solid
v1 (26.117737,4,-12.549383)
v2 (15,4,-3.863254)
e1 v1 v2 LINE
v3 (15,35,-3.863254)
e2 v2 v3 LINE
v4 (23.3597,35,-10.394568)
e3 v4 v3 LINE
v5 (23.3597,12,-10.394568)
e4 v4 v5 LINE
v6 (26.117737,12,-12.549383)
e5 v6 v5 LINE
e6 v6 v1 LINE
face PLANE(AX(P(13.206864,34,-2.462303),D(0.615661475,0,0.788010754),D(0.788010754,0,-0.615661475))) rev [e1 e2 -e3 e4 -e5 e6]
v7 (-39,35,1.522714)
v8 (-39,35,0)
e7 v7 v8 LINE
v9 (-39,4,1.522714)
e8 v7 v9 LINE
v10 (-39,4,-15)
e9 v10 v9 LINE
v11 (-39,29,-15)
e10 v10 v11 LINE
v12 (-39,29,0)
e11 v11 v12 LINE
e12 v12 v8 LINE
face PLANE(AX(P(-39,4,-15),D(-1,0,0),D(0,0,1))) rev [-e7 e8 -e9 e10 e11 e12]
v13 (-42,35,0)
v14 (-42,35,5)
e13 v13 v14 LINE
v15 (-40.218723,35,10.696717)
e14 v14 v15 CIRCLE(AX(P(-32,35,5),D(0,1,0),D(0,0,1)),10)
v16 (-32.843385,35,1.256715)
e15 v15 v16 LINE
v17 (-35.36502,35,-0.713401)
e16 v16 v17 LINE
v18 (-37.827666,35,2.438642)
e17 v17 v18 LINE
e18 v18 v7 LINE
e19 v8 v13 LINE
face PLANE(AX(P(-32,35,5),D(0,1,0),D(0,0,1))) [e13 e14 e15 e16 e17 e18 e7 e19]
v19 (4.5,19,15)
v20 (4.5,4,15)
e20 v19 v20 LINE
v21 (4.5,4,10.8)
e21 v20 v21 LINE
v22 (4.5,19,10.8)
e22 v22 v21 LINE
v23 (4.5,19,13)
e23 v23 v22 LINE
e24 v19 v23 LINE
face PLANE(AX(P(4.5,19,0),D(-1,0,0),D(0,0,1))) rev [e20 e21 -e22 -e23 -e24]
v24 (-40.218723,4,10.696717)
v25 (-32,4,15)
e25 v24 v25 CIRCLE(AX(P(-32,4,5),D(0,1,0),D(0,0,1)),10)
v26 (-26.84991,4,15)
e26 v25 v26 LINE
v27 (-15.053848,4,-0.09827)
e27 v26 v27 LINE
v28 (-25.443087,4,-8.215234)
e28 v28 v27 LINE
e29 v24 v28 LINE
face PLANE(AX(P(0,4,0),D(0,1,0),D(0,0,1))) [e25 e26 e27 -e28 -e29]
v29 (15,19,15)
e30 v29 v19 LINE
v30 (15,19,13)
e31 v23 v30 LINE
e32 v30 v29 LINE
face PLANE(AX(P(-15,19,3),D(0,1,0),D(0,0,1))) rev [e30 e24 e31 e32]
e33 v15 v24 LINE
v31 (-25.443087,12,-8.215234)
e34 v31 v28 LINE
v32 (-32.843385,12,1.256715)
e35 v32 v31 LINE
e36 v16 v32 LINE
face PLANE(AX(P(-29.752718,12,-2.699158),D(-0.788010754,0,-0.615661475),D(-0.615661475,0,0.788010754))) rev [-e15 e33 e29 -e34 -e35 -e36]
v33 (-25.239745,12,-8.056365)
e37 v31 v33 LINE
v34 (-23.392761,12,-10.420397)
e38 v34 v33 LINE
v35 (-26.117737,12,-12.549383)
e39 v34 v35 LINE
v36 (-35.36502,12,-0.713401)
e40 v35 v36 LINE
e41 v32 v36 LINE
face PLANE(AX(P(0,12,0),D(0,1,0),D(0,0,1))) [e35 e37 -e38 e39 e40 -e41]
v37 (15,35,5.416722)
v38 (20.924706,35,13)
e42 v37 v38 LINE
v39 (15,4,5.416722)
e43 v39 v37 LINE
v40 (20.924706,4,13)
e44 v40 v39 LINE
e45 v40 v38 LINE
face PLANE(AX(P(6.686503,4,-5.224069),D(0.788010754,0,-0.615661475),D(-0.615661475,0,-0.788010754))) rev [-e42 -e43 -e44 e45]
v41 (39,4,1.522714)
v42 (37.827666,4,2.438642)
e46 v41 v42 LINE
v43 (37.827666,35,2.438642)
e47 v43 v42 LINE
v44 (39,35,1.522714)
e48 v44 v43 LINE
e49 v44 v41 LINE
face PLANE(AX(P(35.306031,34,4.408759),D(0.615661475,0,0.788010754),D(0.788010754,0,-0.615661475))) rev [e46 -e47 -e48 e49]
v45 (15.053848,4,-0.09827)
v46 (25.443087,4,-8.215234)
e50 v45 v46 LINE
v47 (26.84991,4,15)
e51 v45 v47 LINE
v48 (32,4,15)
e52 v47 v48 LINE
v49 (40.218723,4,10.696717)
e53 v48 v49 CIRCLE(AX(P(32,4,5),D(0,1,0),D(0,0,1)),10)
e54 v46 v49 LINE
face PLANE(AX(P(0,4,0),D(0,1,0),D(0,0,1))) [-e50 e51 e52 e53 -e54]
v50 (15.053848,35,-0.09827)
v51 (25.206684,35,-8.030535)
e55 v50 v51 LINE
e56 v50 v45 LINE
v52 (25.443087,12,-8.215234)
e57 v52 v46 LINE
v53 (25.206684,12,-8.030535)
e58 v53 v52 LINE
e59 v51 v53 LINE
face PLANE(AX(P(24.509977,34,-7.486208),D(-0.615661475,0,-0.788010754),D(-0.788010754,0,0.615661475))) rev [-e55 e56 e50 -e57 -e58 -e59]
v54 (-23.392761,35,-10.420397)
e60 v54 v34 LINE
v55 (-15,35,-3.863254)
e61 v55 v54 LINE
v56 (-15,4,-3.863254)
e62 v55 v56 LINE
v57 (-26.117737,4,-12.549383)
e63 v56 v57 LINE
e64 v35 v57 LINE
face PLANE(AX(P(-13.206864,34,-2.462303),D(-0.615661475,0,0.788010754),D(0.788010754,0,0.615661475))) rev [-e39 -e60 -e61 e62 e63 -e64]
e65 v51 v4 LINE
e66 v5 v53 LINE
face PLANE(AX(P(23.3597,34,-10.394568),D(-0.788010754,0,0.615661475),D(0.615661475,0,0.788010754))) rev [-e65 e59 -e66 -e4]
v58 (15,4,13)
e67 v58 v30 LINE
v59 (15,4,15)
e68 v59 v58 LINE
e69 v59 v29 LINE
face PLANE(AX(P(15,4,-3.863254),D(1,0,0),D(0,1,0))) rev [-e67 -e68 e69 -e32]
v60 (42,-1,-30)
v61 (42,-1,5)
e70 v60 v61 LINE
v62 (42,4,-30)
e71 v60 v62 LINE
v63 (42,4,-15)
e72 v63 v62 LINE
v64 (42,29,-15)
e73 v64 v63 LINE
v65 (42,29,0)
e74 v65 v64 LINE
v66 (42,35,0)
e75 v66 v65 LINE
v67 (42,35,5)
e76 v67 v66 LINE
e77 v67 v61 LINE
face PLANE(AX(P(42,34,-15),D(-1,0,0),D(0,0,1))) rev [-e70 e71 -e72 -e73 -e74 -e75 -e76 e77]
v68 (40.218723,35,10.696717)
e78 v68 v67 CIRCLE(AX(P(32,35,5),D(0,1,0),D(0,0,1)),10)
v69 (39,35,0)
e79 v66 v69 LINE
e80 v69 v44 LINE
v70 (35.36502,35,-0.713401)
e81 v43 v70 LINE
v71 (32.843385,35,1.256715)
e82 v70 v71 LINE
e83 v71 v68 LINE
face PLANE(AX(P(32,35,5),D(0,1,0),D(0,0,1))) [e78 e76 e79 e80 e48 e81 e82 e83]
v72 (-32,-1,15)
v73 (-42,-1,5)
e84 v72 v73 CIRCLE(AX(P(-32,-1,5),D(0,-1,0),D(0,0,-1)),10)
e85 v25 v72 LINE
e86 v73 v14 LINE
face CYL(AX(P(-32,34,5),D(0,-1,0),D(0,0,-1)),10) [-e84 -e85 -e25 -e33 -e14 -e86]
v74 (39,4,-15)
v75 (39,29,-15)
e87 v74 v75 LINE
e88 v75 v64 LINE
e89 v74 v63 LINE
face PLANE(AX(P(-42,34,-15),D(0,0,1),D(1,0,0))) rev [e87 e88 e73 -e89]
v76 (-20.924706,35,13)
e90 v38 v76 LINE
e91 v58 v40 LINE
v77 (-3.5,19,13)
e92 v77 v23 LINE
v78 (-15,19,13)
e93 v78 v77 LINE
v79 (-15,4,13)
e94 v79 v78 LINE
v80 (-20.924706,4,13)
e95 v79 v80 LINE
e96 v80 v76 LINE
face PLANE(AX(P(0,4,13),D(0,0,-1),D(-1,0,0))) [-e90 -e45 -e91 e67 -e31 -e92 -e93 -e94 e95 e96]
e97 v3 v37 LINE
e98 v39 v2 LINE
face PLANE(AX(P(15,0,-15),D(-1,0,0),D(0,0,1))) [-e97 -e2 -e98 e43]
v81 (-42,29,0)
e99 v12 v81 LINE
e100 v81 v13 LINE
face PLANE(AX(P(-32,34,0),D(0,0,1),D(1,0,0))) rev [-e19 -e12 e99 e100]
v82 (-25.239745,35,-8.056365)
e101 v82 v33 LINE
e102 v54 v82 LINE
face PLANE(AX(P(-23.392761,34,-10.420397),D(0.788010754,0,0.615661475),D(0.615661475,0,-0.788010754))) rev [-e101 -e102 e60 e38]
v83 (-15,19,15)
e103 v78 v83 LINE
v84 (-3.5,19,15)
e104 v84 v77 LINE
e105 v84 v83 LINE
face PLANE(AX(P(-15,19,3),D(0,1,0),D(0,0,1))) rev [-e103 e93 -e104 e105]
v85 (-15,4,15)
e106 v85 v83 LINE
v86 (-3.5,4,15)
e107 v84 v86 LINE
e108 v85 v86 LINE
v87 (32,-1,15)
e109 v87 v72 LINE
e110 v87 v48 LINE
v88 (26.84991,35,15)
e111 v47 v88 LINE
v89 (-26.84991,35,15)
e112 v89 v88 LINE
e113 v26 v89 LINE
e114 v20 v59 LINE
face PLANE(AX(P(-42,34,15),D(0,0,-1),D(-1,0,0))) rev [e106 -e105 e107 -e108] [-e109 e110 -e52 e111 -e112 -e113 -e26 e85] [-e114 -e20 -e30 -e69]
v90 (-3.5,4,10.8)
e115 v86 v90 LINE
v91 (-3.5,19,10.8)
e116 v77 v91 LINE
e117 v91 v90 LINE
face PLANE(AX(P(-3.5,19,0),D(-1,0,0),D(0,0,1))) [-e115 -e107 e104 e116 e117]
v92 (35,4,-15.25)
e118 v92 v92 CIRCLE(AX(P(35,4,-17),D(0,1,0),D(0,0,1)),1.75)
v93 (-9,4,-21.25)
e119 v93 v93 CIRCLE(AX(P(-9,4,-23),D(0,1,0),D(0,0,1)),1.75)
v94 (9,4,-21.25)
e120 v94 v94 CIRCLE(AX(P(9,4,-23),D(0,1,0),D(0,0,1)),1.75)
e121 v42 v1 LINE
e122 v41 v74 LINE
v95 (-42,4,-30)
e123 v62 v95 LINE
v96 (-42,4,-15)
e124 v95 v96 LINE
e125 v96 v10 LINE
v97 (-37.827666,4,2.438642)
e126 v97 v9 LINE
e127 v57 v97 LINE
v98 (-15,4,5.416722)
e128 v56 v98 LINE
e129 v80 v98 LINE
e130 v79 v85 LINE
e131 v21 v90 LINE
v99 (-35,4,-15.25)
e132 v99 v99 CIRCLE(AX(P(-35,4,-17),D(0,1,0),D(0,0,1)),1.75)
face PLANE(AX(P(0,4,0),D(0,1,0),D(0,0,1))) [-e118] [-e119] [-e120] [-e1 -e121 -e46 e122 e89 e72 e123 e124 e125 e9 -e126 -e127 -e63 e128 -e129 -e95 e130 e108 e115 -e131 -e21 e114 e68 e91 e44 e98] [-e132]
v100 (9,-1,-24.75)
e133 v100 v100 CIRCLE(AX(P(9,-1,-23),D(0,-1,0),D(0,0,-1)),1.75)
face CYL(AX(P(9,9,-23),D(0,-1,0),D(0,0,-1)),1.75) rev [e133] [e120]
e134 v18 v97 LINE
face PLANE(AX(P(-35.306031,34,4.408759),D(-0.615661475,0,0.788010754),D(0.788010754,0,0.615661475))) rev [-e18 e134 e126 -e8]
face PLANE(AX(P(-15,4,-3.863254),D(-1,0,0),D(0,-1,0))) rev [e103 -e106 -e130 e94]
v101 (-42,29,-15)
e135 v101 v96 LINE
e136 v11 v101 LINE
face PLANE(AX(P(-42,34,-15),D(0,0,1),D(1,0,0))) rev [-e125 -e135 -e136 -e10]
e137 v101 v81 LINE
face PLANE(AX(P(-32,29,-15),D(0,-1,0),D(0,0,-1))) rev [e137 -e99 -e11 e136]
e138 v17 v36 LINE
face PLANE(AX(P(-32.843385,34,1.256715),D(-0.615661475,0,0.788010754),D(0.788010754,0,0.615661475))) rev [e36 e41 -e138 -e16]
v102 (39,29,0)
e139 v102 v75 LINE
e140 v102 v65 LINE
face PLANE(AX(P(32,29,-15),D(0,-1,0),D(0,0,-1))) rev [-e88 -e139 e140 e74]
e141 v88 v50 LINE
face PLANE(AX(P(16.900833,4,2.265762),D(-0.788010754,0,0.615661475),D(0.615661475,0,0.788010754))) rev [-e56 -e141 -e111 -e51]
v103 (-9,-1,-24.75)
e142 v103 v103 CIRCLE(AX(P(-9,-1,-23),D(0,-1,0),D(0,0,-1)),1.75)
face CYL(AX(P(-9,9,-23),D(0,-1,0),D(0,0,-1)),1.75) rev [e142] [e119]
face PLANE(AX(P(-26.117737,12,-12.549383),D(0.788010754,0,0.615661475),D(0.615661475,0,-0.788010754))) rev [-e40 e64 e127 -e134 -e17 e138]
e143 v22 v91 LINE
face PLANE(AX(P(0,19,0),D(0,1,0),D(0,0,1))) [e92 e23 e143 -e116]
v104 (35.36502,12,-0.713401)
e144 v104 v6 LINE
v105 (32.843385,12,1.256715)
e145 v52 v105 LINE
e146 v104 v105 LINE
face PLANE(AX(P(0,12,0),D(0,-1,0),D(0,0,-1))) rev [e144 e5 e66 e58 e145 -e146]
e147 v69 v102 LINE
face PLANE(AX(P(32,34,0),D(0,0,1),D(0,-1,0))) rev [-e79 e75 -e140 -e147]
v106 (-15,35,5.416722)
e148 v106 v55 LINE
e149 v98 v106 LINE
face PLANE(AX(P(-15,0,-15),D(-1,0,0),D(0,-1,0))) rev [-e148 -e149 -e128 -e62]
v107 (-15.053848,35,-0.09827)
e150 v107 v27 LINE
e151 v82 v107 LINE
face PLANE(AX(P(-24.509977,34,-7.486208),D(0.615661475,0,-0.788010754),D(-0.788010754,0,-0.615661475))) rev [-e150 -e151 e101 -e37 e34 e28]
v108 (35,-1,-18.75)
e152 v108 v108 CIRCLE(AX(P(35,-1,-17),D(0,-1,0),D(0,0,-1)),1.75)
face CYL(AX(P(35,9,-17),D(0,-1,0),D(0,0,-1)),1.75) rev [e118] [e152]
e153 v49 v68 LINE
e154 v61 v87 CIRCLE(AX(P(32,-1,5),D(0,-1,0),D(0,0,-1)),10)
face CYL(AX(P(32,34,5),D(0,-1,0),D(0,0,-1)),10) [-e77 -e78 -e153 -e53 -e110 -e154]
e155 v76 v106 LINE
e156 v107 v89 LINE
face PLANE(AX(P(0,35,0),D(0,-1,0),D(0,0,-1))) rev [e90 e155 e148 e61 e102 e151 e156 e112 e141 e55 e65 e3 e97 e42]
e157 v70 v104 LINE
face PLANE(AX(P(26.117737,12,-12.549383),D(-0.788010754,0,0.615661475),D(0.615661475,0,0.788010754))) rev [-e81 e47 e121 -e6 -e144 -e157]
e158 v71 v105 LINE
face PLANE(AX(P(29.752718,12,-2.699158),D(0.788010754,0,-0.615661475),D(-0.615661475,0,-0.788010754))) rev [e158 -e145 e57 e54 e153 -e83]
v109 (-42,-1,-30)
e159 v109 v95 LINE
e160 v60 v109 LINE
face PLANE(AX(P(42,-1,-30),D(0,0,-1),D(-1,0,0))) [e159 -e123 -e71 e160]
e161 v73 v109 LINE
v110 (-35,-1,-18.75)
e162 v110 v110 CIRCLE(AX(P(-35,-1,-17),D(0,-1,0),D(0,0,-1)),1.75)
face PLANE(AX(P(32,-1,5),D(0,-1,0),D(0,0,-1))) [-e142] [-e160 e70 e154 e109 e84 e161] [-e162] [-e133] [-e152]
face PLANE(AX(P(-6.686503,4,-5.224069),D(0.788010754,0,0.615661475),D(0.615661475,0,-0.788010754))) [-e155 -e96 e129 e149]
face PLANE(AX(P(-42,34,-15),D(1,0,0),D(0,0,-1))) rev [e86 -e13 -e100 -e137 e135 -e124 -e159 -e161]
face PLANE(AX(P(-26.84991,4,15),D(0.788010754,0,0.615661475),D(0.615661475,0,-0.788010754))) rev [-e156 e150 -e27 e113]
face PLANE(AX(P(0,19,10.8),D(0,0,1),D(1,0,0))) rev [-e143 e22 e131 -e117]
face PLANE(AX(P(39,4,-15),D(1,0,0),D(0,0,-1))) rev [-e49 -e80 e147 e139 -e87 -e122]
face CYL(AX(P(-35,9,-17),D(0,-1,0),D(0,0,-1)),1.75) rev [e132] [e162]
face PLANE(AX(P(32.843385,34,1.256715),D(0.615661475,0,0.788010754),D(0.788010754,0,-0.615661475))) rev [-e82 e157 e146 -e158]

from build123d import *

# Parameters (mm, degrees)
SKETCH_1_W           = 84
SKETCH_1_H           = 30
EXTRUDE_1_DEPTH      = 34
CUT_EXTRUDE_1_DEPTH  = 30
SKETCH_4_W           = 15
SKETCH_4_H           = 18
CUT_EXTRUDE_4_DEPTH  = 30
CUT_EXTRUDE_6_DEPTH  = 30
SKETCH_8_W           = 78
SKETCH_8_H           = 28
CUT_EXTRUDE_7_DEPTH  = 30
EXTRUDE_4_DEPTH      = 30
EXTRUDE_5_DEPTH      = 30
SKETCH_11_W          = 30
SKETCH_11_H          = 18
CUT_EXTRUDE_9_DEPTH  = 61.860496219
CUT_EXTRUDE_12_DEPTH = 30
EXTRUDE_6_DEPTH      = 30
EXTRUDE_9_DEPTH      = 8
CUT_EXTRUDE_16_DEPTH = 30
EXTRUDE_10_DEPTH     = 30
SKETCH_27_W          = 84
SKETCH_27_H          = 1
CUT_EXTRUDE_17_DEPTH = 62.806148561
SKETCH_28_W          = 26.41372768
SKETCH_28_H          = 2
CUT_EXTRUDE_18_DEPTH = 12
SKETCH_29_W          = 2
SKETCH_29_H          = 18
EXTRUDE_11_DEPTH     = 30
SKETCH_30_W          = 30
SKETCH_30_H          = 18.863254254
CUT_EXTRUDE_19_DEPTH = 12
SKETCH_31_W          = 30
SKETCH_31_H          = 3
CUT_EXTRUDE_20_DEPTH = 12
SKETCH_32_W          = 15
SKETCH_32_H          = 5
CUT_EXTRUDE_21_DEPTH = 10
SKETCH_33_W          = 15
SKETCH_33_H          = 5
CUT_EXTRUDE_22_DEPTH = 10
SKETCH_39_W          = 30
SKETCH_39_H          = 3
EXTRUDE_12_DEPTH     = 1
CHAMFER_1_SIZE       = 10
CHAMFER_1_SIZE_2     = 5.773502692
EXTRUDE_13_DEPTH     = 8
EXTRUDE_14_DEPTH     = 22
FILLET_1_R           = 10
SKETCH_44_W          = 3.5
SKETCH_44_H          = 4.2
SKETCH_44_W_2        = 4.5
EXTRUDE_16_DEPTH     = 15
EXTRUDE_START        = 1
EXTRUDE_17_DEPTH     = 1
EXTRUDE_20_DEPTH     = 2
EXTRUDE_21_DEPTH     = 5
SKETCH_52_R          = 1.75
CUT_EXTRUDE_23_DEPTH = 10


with BuildPart() as part:
    # 草图1 → 凸台-拉伸1 (new body)
    with BuildSketch(Plane(origin=(0, 0, 0), x_dir=(1, 0, 0), z_dir=(0, 1, 0))):
        Rectangle(SKETCH_1_W, SKETCH_1_H)
    extrude(amount=EXTRUDE_1_DEPTH)

    # 草图2 → 切除-拉伸1 (cut)
    with BuildSketch(Plane(origin=(0, 34, 0), x_dir=(1, 0, 0), z_dir=(0, 1, 0))):
        Polygon((-39, 15), (-3.161634299, -13), (3.161634299, -13), (39, 15), align=None)
    extrude(amount=-CUT_EXTRUDE_1_DEPTH, mode=Mode.SUBTRACT)

    # 草图4 → 切除-拉伸4 (cut)
    with BuildSketch(Plane.XY.offset(15)):
        with Locations((-7.5, 25)):
            Rectangle(SKETCH_4_W, SKETCH_4_H)
        with Locations((7.5, 25)):
            Rectangle(SKETCH_4_W, SKETCH_4_H)
    extrude(amount=-CUT_EXTRUDE_4_DEPTH, mode=Mode.SUBTRACT)

    # 草图3 → 切除-拉伸6 (cut)
    with BuildSketch(Plane(origin=(0, 34, 0), x_dir=(1, 0, 0), z_dir=(0, 1, 0))):
        Polygon((-26.356961736, 5.122175929), (-42, -14.9), (-42, -15), (-26.849909982, -15), (-16.900832692, -2.265761775), align=None)
        Polygon((42, -14.9), (26.356961736, 5.122175929), (16.900832692, -2.265761775), (26.849909982, -15), (42, -15), align=None)
    extrude(amount=-CUT_EXTRUDE_6_DEPTH, mode=Mode.SUBTRACT)

    # 草图8 → 切除-拉伸7 (cut)
    with BuildSketch(Plane(origin=(0, 34, 0), x_dir=(1, 0, 0), z_dir=(0, 1, 0))):
        with Locations((0, 1)):
            Rectangle(SKETCH_8_W, SKETCH_8_H)
    extrude(amount=-CUT_EXTRUDE_7_DEPTH, mode=Mode.SUBTRACT)

    # 草图6 → 凸台-拉伸4 (add)
    with BuildSketch(Plane(origin=(0, 4, 0), x_dir=(1, 0, 0), z_dir=(0, 1, 0))):
        Polygon((-24.50997731, 7.486208189), (-15.053848266, 0.098270486), (-13.20686384, 2.462302746), (-22.662992884, 9.85024045), align=None)
        Polygon((13.20686384, 2.462302746), (22.662992884, 9.85024045), (24.50997731, 7.486208189), (15.053848266, 0.098270486), align=None)
    extrude(amount=EXTRUDE_4_DEPTH)

    # 草图9 → 凸台-拉伸5 (add)
    with BuildSketch(Plane(origin=(0, 4, 0), x_dir=(1, 0, 0), z_dir=(0, 1, 0))):
        Polygon((13.20686384, 2.462302746), (13.20686384, -13), (24.529623979, -13), (25.287338729, -13), (15.053848266, 0.098270486), align=None)
        Polygon((-15.053848266, 0.098270486), (-25.287338729, -13), (-24.529623979, -13), (-13.20686384, -13), (-13.20686384, 2.462302746), align=None)
    extrude(amount=EXTRUDE_5_DEPTH)

    # 草图11 → 切除-拉伸9 (cut, through all)
    with BuildSketch(Plane.XY.offset(13)):
        with Locations((0, 25)):
            Rectangle(SKETCH_11_W, SKETCH_11_H)
    extrude(amount=-CUT_EXTRUDE_9_DEPTH, mode=Mode.SUBTRACT)

    # 草图14 → 切除-拉伸12 (cut)
    with BuildSketch(Plane(origin=(0, 34, 0), x_dir=(1, 0, 0), z_dir=(0, 1, 0))):
        Polygon((-15, -5.416722485), (-20.924705724, -13), (-15, -13), align=None)
        Polygon((15, -13), (20.924705724, -13), (15, -5.416722485), align=None)
    extrude(amount=-CUT_EXTRUDE_12_DEPTH, mode=Mode.SUBTRACT)

    # 草图17 → 凸台-拉伸6 (add)
    with BuildSketch(Plane(origin=(0, 4, 0), x_dir=(1, 0, 0), z_dir=(0, 1, 0))):
        Polygon((-22.662992884, 9.85024045), (-23.392760551, 10.420397439), (-25.239744977, 8.056365178), (-24.50997731, 7.486208189), align=None)
        Polygon((22.662992884, 9.85024045), (23.359699806, 10.394567554), (25.206684232, 8.030535294), (24.50997731, 7.486208189), align=None)
    extrude(amount=EXTRUDE_6_DEPTH)

    # 草图23 → 凸台-拉伸9 (add)
    with BuildSketch(Plane(origin=(0, 4, 0), x_dir=(1, 0, 0), z_dir=(0, 1, 0))):
        Polygon((23.359699806, 10.394567554), (26.117737443, 12.549382718), (32.274352197, 4.669275182), (29.752717785, 2.699158461), (25.443087458, 8.215233736), (25.206684232, 8.030535294), align=None)
        Polygon((-25.206684232, 8.030535294), (-23.359699806, 10.394567554), (-26.117737443, 12.549382718), (-32.274352197, 4.669275182), (-29.752717785, 2.699158461), (-25.443087458, 8.215233736), align=None)
    extrude(amount=EXTRUDE_9_DEPTH)

    # 草图25 → 切除-拉伸16 (cut)
    with BuildSketch(Plane(origin=(0, 34, 0), x_dir=(1, 0, 0), z_dir=(0, 1, 0))):
        Polygon((-39, -11.060175103), (-39, -9.136823031), (-42, -12.976647927), (-42, -14.9), align=None)
        Polygon((42, -12.976647927), (42, -14.9), (39, -11.060175103), (39, -9.136823031), align=None)
    extrude(amount=-CUT_EXTRUDE_16_DEPTH, mode=Mode.SUBTRACT)

    # 草图26 → 凸台-拉伸10 (add)
    with BuildSketch(Plane(origin=(0, 4, 0), x_dir=(1, 0, 0), z_dir=(0, 1, 0))):
        Polygon((-39, -9.136823031), (-35.306031148, -4.408758509), (-39, -1.52271374), align=None)
        Polygon((39, -1.52271374), (39, -9.136823031), (35.306031148, -4.408758509), align=None)
    extrude(amount=EXTRUDE_10_DEPTH)

    # 草图27 → 切除-拉伸17 (cut, through all)
    with BuildSketch(Plane(origin=(0, 0, -15), x_dir=(-1, 0, 0), z_dir=(0, 0, -1))):
        with Locations((0, 0.5)):
            Rectangle(SKETCH_27_W, SKETCH_27_H)
    extrude(amount=-CUT_EXTRUDE_17_DEPTH, mode=Mode.SUBTRACT)

    # 草图28 → 切除-拉伸18 (cut)
    with BuildSketch(Plane(origin=(0, 16, 0), x_dir=(1, 0, 0), z_dir=(0, 1, 0))):
        with Locations((0, -14)):
            Rectangle(SKETCH_28_W, SKETCH_28_H)
    extrude(amount=-CUT_EXTRUDE_18_DEPTH, mode=Mode.SUBTRACT)

    # 草图29 → 凸台-拉伸11 (add)
    with BuildSketch(Plane(origin=(-15, 0, 0), x_dir=(0, 0, -1), z_dir=(1, 0, 0))):
        with Locations((-14, 25)):
            Rectangle(SKETCH_29_W, SKETCH_29_H)
    extrude(amount=EXTRUDE_11_DEPTH)

    # 草图30 → 切除-拉伸19 (cut)
    with BuildSketch(Plane(origin=(0, 16, 0), x_dir=(1, 0, 0), z_dir=(0, 1, 0))):
        with Locations((0, -5.568372873)):
            Rectangle(SKETCH_30_W, SKETCH_30_H)
    extrude(amount=-CUT_EXTRUDE_19_DEPTH, mode=Mode.SUBTRACT)

    # 草图31 → 切除-拉伸20 (cut)
    with BuildSketch(Plane.XY.offset(15)):
        with Locations((0, 17.5)):
            Rectangle(SKETCH_31_W, SKETCH_31_H)
    extrude(amount=-CUT_EXTRUDE_20_DEPTH, mode=Mode.SUBTRACT)

    # 草图32 → 切除-拉伸21 (cut)
    with BuildSketch(Plane.ZY.offset(42)):
        with Locations((-7.5, 31.5)):
            Rectangle(SKETCH_32_W, SKETCH_32_H)
    extrude(amount=-CUT_EXTRUDE_21_DEPTH, mode=Mode.SUBTRACT)

    # 草图33 → 切除-拉伸22 (cut)
    with BuildSketch(Plane(origin=(42, 0, 0), x_dir=(0, 0, -1), z_dir=(1, 0, 0))):
        with Locations((7.5, 31.5)):
            Rectangle(SKETCH_33_W, SKETCH_33_H)
    extrude(amount=-CUT_EXTRUDE_22_DEPTH, mode=Mode.SUBTRACT)

    # 草图39 → 凸台-拉伸12 (add)
    with BuildSketch(Plane(origin=(0, 0, -15), x_dir=(-1, 0, 0), z_dir=(0, 0, -1))):
        with Locations((0, 2.5)):
            Rectangle(SKETCH_39_W, SKETCH_39_H)
    extrude(amount=EXTRUDE_12_DEPTH)

    # 倒角1
    # the kernel refuses this chamfer: 10, 5.773502692 mm, written as the material it adds along each edge
    with BuildSketch(Plane(origin=(-15, 4, -15), x_dir=(-0.9998132206222079, 0, 0.01932676561270081), z_dir=(0, -1, 0))) as chamfer_1_piece_1_section:
        Polygon((CHAMFER_1_SIZE * 0.999813220622, CHAMFER_1_SIZE * 0.0193267656127), (-CHAMFER_1_SIZE_2 * 0.0193267656124, CHAMFER_1_SIZE_2 * 0.999813220604), (0, 0), align=None)
    chamfer_1_piece_1 = extrude(amount=3, mode=Mode.PRIVATE)
    chamfer_1_piece_1 = split(chamfer_1_piece_1, bisect_by=Plane(origin=(-19.75963278, 2.5, -16), z_dir=(0, 0, 1)), keep=Keep.TOP, mode=Mode.PRIVATE)
    add(chamfer_1_piece_1)
    with BuildSketch(Plane(origin=(15, 1, -15), x_dir=(0.9998132206222079, 0, 0.01932676561270081), z_dir=(0, 1, 0))) as chamfer_1_piece_2_section:
        Polygon((CHAMFER_1_SIZE * 0.999813220622, CHAMFER_1_SIZE * 0.0193267656127), (-CHAMFER_1_SIZE_2 * 0.0193267656124, CHAMFER_1_SIZE_2 * 0.999813220604), (0, 0), align=None)
    chamfer_1_piece_2 = extrude(amount=3, mode=Mode.PRIVATE)
    chamfer_1_piece_2 = split(chamfer_1_piece_2, bisect_by=Plane(origin=(19.75963278, 2.5, -16), z_dir=(0, 0, 1)), keep=Keep.TOP, mode=Mode.PRIVATE)
    add(chamfer_1_piece_2)

    # 草图41 → 凸台-拉伸13 (add)
    with BuildSketch(Plane(origin=(0, 4, 0), x_dir=(1, 0, 0), z_dir=(0, 1, 0))):
        Polygon((-32.274352197, 4.669275182), (-37.82766556, -2.438641788), (-35.306031148, -4.408758509), (-29.752717785, 2.699158461), align=None)
        Polygon((29.752717785, 2.699158461), (35.306031148, -4.408758509), (37.82766556, -2.438641788), (32.274352197, 4.669275182), align=None)
    extrude(amount=EXTRUDE_13_DEPTH)

    # 草图42 → 凸台-拉伸14 (add)
    with BuildSketch(Plane(origin=(0, 12, 0), x_dir=(1, 0, 0), z_dir=(0, 1, 0))):
        Polygon((35.306031148, -4.408758509), (32.843385247, -1.256715495), (35.365019658, 0.713401226), (37.82766556, -2.438641788), align=None)
        Polygon((-37.82766556, -2.438641788), (-35.306031148, -4.408758509), (-32.843385247, -1.256715495), (-35.365019658, 0.713401226), align=None)
    extrude(amount=EXTRUDE_14_DEPTH)

    # 圆角1
    fillet_1_edges = [part.edges().sort_by_distance(p)[0] for p in [
        (42, 2.5, 15),
        (-42, 2.5, 15),
    ]]
    fillet(fillet_1_edges, radius=FILLET_1_R)

    # 草图44 → 凸台-拉伸16 (add)
    with BuildSketch(Plane(origin=(0, 4, 0), x_dir=(1, 0, 0), z_dir=(0, 1, 0))):
        with Locations((-1.75, -12.9)):
            Rectangle(SKETCH_44_W, SKETCH_44_H)
        with Locations((2.25, -12.9)):
            Rectangle(SKETCH_44_W_2, SKETCH_44_H)
    extrude(amount=EXTRUDE_16_DEPTH)

    # 草图47 → 凸台-拉伸17 (add)
    with BuildSketch(Plane(origin=(0, 34, 0), x_dir=(1, 0, 0), z_dir=(0, 1, 0)).offset(EXTRUDE_START)):
        with BuildLine():
            Line((32.843385247, -1.256715495), (40.218723124, -10.696717495))
            ThreePointArc((40.218723124, -10.696717495), (41.544297545, -7.984356611), (42, -5))
            Line((42, -5), (42, 0))
            Line((42, 0), (39, 0))
            Line((39, 0), (39, -1.52271374))
            Line((39, -1.52271374), (37.82766556, -2.438641788))
            Line((37.82766556, -2.438641788), (35.365019658, 0.713401226))
            Line((35.365019658, 0.713401226), (32.843385247, -1.256715495))
        make_face()
        with BuildLine():
            Line((-42, 0), (-42, -5))
            ThreePointArc((-42, -5), (-41.544297545, -7.984356611), (-40.218723124, -10.696717495))
            Line((-40.218723124, -10.696717495), (-32.843385247, -1.256715495))
            Line((-32.843385247, -1.256715495), (-35.365019658, 0.713401226))
            Line((-35.365019658, 0.713401226), (-37.82766556, -2.438641788))
            Line((-37.82766556, -2.438641788), (-39, -1.52271374))
            Line((-39, -1.52271374), (-39, 0))
            Line((-39, 0), (-42, 0))
        make_face()
        Polygon((15, -5.416722485), (20.924705724, -13), (-20.924705724, -13), (-15, -5.416722485), (-15, 3.863254254), (-23.392760551, 10.420397439), (-25.239744977, 8.056365178), (-15.053848266, 0.098270486), (-26.849909982, -15), (26.849909982, -15), (15.053848266, 0.098270486), (25.206684232, 8.030535294), (23.359699806, 10.394567554), (15, 3.863254254), align=None)
    extrude(amount=-EXTRUDE_17_DEPTH)

    # 草图50 → 凸台-拉伸20 (add)
    with BuildSketch(Plane.XZ.offset(-1)):
        with BuildLine():
            Line((-42, -15), (-25, -15))
            Line((-25, -15), (-23.267949192, -16))
            Line((-23.267949192, -16), (23.267949192, -16))
            Line((23.267949192, -16), (25, -15))
            Line((25, -15), (42, -15))
            Line((42, -15), (42, 5))
            ThreePointArc((42, 5), (39.071067812, 12.071067812), (32, 15))
            Line((32, 15), (-32, 15))
            ThreePointArc((-32, 15), (-39.071067812, 12.071067812), (-42, 5))
            Line((-42, 5), (-42, -15))
        make_face()
    extrude(amount=EXTRUDE_20_DEPTH)

    # 草图51 → 凸台-拉伸21 (add)
    with BuildSketch(Plane(origin=(0, 4, 0), x_dir=(1, 0, 0), z_dir=(0, 1, 0))):
        Polygon((-42, 15), (-25, 15), (-23.267949192, 16), (23.267949192, 16), (25, 15), (42, 15), (42, 30), (-42, 30), align=None)
    extrude(amount=-EXTRUDE_21_DEPTH)

    # 草图52 → 切除-拉伸23 (cut)
    with BuildSketch(Plane.XZ.offset(1)):
        with Locations(Location((35, -17, 0), (0, 0, 270))):
            Circle(SKETCH_52_R)
        with Locations(Location((9, -23, 0), (0, 0, 270))):
            Circle(SKETCH_52_R)
        with Locations(Location((-9, -23, 0), (0, 0, 270))):
            Circle(SKETCH_52_R)
        with Locations(Location((-35, -17, 0), (0, 0, 270))):
            Circle(SKETCH_52_R)
    extrude(amount=-CUT_EXTRUDE_23_DEPTH, mode=Mode.SUBTRACT)


solid = part.part
